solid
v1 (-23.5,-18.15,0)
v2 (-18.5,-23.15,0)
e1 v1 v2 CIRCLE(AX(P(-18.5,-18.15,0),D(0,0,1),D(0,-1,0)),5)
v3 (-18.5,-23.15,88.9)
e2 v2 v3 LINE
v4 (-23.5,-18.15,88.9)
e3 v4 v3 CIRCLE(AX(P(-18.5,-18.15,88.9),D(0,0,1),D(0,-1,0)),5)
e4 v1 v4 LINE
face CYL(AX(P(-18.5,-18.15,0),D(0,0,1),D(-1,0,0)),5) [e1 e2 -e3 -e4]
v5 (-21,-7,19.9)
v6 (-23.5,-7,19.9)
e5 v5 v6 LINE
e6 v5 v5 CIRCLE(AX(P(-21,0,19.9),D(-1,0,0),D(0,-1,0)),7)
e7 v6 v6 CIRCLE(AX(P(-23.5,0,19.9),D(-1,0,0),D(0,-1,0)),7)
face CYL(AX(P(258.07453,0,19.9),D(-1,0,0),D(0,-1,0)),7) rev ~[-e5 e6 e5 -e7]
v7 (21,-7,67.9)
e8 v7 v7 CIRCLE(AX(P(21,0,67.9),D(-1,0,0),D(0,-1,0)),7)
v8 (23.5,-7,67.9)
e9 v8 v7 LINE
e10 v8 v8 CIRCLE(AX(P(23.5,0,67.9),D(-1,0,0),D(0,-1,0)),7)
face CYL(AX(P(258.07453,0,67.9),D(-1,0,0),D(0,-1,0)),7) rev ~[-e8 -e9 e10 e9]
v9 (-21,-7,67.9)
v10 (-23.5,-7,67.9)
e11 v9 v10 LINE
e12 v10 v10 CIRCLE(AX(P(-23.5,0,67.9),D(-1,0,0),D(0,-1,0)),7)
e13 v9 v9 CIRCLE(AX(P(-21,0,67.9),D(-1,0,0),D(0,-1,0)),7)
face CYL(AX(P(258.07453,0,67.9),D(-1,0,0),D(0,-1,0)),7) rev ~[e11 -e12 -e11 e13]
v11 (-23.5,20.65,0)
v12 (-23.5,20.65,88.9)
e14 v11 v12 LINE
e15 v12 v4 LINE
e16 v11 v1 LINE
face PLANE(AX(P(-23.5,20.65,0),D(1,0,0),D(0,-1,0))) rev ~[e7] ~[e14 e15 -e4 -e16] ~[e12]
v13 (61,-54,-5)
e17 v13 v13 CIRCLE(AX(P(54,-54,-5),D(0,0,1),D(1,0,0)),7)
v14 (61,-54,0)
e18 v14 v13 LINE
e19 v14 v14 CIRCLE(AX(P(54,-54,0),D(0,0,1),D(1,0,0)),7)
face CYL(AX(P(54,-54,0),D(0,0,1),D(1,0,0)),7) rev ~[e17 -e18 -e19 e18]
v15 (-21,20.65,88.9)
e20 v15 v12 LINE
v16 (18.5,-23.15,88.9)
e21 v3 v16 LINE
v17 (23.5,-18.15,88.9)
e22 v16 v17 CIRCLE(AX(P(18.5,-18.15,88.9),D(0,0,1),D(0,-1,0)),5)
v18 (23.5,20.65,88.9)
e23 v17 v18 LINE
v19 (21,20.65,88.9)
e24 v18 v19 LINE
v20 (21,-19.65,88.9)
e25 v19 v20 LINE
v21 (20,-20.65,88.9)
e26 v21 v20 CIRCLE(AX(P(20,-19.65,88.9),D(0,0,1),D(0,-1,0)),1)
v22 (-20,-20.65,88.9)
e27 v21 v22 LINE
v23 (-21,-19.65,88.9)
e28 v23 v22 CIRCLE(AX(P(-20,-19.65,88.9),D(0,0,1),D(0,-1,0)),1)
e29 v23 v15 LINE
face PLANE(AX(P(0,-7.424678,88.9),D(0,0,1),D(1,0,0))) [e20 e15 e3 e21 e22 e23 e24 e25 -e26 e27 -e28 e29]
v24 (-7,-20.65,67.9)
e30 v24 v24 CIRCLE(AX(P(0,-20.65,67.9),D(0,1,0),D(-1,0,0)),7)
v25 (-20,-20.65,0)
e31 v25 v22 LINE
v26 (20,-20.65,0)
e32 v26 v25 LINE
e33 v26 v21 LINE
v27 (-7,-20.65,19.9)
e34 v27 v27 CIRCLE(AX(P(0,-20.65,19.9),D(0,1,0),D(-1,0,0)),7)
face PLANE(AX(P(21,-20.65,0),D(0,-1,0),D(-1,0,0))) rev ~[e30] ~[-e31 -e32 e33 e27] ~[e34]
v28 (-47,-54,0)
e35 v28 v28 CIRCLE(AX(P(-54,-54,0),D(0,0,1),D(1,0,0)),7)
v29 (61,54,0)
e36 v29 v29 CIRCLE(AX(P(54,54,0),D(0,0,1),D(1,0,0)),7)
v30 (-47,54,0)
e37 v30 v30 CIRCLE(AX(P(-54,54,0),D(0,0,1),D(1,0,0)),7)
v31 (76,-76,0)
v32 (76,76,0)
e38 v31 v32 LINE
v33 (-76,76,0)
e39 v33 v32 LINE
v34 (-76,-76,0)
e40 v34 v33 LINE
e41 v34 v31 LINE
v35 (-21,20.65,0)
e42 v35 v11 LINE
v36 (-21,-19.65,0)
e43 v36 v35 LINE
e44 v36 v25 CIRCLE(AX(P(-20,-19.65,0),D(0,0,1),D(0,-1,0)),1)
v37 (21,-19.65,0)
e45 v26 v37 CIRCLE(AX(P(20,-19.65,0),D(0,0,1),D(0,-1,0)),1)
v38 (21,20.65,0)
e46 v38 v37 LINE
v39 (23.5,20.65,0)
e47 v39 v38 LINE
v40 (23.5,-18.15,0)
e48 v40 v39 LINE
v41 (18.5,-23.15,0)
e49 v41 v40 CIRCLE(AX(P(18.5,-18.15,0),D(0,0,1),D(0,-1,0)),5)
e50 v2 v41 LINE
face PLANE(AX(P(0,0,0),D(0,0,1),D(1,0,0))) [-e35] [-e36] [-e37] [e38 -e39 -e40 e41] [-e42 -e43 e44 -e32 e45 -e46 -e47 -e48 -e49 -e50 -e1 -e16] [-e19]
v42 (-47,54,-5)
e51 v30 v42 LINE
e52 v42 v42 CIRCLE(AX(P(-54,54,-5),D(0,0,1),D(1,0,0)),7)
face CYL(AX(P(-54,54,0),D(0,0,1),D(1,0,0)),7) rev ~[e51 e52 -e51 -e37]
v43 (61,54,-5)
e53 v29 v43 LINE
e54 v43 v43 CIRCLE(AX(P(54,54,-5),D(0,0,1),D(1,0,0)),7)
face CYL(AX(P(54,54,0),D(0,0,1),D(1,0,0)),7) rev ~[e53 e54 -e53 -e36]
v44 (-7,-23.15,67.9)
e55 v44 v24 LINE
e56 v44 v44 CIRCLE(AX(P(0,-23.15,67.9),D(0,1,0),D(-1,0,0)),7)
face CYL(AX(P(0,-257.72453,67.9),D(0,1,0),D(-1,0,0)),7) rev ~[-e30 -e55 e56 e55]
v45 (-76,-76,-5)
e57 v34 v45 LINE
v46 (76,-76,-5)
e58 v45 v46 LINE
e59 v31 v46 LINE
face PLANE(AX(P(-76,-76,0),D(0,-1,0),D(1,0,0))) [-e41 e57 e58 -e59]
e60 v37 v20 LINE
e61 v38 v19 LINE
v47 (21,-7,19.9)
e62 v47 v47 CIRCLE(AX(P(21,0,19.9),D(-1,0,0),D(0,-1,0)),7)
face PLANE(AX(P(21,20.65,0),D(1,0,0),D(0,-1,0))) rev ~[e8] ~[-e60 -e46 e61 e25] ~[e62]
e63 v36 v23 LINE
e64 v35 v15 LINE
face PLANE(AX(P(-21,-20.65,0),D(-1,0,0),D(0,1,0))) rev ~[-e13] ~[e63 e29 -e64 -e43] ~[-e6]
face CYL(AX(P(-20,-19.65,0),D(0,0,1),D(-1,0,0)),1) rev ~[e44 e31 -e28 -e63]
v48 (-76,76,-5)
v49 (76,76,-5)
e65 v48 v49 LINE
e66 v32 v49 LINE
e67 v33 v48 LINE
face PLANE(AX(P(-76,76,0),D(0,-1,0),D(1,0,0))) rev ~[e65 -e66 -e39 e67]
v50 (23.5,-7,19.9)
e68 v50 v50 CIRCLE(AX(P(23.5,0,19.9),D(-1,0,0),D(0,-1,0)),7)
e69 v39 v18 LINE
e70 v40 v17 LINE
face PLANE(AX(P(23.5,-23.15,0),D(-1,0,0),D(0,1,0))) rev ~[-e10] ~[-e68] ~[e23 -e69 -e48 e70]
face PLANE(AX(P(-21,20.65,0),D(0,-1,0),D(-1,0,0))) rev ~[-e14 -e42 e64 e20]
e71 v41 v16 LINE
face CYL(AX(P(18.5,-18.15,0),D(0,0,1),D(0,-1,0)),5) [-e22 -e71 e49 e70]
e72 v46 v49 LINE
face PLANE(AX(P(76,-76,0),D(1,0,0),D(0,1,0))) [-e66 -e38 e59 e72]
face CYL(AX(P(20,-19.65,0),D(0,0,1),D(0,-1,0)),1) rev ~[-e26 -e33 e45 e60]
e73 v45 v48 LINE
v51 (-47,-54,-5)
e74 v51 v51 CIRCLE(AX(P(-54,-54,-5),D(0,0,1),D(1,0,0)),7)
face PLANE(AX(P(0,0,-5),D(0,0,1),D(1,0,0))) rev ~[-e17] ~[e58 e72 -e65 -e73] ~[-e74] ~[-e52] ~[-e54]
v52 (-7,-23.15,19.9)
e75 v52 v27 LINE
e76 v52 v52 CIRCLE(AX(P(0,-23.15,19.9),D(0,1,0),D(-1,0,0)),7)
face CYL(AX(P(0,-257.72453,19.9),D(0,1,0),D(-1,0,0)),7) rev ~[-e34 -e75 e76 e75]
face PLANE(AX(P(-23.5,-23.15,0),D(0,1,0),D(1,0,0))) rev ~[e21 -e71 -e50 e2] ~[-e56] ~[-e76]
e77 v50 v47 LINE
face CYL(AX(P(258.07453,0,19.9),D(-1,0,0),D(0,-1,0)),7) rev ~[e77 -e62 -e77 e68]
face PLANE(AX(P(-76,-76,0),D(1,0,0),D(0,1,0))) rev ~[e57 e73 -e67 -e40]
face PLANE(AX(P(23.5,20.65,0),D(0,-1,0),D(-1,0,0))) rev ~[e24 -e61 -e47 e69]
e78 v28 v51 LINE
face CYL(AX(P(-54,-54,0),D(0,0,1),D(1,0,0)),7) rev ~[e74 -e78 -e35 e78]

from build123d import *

# Parameters (mm, degrees)
F0_W     = 152
F0_H     = 152
F0_R     = 7
F1_DEPTH = 5
F3_DEPTH = 88.9
F4_R     = 5
F5_R     = 1
F7_D     = 14
F9_D     = 14


# Not quite as in the source:
# - a feature names something its author has since deleted; it is built from what else it names


with BuildPart() as f1:
    # F0 (on Top) → F1 (new body)
    with BuildSketch(Plane.XY):
        Rectangle(F0_W, F0_H)
        with Locations((-54, -54)):
            Circle(F0_R, mode=Mode.SUBTRACT)
        with Locations((54, -54)):
            Circle(F0_R, mode=Mode.SUBTRACT)
        with Locations((-54, 54)):
            Circle(F0_R, mode=Mode.SUBTRACT)
        with Locations((54, 54)):
            Circle(F0_R, mode=Mode.SUBTRACT)
    extrude(amount=-F1_DEPTH)

    # F2 (on face) → F3 (join)
    with BuildSketch(Plane.XY):
        Polygon((-21, 20.65), (-23.5, 20.65), (-23.5, -23.15), (23.5, -23.15), (23.5, 20.65), (21, 20.65), (21, -20.65), (-21, -20.65), align=None)
    extrude(amount=F3_DEPTH)

    # F4
    f4_edges = [f1.edges().sort_by_distance(p)[0] for p in [
        (23.5, -23.15, 44.45),
        (-23.5, -23.15, 44.45),
    ]]
    fillet(f4_edges, radius=F4_R)

    # F5
    f5_edges = [f1.edges().sort_by_distance(p)[0] for p in [
        (21, -20.65, 44.45),
        (-21, -20.65, 44.45),
    ]]
    fillet(f5_edges, radius=F5_R)

    # F7 (through all)
    with Locations(Plane.YZ.offset(23.5)):
        with Locations((0, 67.9), (0, 19.9)):
            Hole(F7_D / 2)

    # F9 (through all)
    with Locations(Plane.XZ.offset(23.15)):
        with Locations((0, 67.9), (0, 19.9)):
            Hole(F9_D / 2)


solid = f1.part
